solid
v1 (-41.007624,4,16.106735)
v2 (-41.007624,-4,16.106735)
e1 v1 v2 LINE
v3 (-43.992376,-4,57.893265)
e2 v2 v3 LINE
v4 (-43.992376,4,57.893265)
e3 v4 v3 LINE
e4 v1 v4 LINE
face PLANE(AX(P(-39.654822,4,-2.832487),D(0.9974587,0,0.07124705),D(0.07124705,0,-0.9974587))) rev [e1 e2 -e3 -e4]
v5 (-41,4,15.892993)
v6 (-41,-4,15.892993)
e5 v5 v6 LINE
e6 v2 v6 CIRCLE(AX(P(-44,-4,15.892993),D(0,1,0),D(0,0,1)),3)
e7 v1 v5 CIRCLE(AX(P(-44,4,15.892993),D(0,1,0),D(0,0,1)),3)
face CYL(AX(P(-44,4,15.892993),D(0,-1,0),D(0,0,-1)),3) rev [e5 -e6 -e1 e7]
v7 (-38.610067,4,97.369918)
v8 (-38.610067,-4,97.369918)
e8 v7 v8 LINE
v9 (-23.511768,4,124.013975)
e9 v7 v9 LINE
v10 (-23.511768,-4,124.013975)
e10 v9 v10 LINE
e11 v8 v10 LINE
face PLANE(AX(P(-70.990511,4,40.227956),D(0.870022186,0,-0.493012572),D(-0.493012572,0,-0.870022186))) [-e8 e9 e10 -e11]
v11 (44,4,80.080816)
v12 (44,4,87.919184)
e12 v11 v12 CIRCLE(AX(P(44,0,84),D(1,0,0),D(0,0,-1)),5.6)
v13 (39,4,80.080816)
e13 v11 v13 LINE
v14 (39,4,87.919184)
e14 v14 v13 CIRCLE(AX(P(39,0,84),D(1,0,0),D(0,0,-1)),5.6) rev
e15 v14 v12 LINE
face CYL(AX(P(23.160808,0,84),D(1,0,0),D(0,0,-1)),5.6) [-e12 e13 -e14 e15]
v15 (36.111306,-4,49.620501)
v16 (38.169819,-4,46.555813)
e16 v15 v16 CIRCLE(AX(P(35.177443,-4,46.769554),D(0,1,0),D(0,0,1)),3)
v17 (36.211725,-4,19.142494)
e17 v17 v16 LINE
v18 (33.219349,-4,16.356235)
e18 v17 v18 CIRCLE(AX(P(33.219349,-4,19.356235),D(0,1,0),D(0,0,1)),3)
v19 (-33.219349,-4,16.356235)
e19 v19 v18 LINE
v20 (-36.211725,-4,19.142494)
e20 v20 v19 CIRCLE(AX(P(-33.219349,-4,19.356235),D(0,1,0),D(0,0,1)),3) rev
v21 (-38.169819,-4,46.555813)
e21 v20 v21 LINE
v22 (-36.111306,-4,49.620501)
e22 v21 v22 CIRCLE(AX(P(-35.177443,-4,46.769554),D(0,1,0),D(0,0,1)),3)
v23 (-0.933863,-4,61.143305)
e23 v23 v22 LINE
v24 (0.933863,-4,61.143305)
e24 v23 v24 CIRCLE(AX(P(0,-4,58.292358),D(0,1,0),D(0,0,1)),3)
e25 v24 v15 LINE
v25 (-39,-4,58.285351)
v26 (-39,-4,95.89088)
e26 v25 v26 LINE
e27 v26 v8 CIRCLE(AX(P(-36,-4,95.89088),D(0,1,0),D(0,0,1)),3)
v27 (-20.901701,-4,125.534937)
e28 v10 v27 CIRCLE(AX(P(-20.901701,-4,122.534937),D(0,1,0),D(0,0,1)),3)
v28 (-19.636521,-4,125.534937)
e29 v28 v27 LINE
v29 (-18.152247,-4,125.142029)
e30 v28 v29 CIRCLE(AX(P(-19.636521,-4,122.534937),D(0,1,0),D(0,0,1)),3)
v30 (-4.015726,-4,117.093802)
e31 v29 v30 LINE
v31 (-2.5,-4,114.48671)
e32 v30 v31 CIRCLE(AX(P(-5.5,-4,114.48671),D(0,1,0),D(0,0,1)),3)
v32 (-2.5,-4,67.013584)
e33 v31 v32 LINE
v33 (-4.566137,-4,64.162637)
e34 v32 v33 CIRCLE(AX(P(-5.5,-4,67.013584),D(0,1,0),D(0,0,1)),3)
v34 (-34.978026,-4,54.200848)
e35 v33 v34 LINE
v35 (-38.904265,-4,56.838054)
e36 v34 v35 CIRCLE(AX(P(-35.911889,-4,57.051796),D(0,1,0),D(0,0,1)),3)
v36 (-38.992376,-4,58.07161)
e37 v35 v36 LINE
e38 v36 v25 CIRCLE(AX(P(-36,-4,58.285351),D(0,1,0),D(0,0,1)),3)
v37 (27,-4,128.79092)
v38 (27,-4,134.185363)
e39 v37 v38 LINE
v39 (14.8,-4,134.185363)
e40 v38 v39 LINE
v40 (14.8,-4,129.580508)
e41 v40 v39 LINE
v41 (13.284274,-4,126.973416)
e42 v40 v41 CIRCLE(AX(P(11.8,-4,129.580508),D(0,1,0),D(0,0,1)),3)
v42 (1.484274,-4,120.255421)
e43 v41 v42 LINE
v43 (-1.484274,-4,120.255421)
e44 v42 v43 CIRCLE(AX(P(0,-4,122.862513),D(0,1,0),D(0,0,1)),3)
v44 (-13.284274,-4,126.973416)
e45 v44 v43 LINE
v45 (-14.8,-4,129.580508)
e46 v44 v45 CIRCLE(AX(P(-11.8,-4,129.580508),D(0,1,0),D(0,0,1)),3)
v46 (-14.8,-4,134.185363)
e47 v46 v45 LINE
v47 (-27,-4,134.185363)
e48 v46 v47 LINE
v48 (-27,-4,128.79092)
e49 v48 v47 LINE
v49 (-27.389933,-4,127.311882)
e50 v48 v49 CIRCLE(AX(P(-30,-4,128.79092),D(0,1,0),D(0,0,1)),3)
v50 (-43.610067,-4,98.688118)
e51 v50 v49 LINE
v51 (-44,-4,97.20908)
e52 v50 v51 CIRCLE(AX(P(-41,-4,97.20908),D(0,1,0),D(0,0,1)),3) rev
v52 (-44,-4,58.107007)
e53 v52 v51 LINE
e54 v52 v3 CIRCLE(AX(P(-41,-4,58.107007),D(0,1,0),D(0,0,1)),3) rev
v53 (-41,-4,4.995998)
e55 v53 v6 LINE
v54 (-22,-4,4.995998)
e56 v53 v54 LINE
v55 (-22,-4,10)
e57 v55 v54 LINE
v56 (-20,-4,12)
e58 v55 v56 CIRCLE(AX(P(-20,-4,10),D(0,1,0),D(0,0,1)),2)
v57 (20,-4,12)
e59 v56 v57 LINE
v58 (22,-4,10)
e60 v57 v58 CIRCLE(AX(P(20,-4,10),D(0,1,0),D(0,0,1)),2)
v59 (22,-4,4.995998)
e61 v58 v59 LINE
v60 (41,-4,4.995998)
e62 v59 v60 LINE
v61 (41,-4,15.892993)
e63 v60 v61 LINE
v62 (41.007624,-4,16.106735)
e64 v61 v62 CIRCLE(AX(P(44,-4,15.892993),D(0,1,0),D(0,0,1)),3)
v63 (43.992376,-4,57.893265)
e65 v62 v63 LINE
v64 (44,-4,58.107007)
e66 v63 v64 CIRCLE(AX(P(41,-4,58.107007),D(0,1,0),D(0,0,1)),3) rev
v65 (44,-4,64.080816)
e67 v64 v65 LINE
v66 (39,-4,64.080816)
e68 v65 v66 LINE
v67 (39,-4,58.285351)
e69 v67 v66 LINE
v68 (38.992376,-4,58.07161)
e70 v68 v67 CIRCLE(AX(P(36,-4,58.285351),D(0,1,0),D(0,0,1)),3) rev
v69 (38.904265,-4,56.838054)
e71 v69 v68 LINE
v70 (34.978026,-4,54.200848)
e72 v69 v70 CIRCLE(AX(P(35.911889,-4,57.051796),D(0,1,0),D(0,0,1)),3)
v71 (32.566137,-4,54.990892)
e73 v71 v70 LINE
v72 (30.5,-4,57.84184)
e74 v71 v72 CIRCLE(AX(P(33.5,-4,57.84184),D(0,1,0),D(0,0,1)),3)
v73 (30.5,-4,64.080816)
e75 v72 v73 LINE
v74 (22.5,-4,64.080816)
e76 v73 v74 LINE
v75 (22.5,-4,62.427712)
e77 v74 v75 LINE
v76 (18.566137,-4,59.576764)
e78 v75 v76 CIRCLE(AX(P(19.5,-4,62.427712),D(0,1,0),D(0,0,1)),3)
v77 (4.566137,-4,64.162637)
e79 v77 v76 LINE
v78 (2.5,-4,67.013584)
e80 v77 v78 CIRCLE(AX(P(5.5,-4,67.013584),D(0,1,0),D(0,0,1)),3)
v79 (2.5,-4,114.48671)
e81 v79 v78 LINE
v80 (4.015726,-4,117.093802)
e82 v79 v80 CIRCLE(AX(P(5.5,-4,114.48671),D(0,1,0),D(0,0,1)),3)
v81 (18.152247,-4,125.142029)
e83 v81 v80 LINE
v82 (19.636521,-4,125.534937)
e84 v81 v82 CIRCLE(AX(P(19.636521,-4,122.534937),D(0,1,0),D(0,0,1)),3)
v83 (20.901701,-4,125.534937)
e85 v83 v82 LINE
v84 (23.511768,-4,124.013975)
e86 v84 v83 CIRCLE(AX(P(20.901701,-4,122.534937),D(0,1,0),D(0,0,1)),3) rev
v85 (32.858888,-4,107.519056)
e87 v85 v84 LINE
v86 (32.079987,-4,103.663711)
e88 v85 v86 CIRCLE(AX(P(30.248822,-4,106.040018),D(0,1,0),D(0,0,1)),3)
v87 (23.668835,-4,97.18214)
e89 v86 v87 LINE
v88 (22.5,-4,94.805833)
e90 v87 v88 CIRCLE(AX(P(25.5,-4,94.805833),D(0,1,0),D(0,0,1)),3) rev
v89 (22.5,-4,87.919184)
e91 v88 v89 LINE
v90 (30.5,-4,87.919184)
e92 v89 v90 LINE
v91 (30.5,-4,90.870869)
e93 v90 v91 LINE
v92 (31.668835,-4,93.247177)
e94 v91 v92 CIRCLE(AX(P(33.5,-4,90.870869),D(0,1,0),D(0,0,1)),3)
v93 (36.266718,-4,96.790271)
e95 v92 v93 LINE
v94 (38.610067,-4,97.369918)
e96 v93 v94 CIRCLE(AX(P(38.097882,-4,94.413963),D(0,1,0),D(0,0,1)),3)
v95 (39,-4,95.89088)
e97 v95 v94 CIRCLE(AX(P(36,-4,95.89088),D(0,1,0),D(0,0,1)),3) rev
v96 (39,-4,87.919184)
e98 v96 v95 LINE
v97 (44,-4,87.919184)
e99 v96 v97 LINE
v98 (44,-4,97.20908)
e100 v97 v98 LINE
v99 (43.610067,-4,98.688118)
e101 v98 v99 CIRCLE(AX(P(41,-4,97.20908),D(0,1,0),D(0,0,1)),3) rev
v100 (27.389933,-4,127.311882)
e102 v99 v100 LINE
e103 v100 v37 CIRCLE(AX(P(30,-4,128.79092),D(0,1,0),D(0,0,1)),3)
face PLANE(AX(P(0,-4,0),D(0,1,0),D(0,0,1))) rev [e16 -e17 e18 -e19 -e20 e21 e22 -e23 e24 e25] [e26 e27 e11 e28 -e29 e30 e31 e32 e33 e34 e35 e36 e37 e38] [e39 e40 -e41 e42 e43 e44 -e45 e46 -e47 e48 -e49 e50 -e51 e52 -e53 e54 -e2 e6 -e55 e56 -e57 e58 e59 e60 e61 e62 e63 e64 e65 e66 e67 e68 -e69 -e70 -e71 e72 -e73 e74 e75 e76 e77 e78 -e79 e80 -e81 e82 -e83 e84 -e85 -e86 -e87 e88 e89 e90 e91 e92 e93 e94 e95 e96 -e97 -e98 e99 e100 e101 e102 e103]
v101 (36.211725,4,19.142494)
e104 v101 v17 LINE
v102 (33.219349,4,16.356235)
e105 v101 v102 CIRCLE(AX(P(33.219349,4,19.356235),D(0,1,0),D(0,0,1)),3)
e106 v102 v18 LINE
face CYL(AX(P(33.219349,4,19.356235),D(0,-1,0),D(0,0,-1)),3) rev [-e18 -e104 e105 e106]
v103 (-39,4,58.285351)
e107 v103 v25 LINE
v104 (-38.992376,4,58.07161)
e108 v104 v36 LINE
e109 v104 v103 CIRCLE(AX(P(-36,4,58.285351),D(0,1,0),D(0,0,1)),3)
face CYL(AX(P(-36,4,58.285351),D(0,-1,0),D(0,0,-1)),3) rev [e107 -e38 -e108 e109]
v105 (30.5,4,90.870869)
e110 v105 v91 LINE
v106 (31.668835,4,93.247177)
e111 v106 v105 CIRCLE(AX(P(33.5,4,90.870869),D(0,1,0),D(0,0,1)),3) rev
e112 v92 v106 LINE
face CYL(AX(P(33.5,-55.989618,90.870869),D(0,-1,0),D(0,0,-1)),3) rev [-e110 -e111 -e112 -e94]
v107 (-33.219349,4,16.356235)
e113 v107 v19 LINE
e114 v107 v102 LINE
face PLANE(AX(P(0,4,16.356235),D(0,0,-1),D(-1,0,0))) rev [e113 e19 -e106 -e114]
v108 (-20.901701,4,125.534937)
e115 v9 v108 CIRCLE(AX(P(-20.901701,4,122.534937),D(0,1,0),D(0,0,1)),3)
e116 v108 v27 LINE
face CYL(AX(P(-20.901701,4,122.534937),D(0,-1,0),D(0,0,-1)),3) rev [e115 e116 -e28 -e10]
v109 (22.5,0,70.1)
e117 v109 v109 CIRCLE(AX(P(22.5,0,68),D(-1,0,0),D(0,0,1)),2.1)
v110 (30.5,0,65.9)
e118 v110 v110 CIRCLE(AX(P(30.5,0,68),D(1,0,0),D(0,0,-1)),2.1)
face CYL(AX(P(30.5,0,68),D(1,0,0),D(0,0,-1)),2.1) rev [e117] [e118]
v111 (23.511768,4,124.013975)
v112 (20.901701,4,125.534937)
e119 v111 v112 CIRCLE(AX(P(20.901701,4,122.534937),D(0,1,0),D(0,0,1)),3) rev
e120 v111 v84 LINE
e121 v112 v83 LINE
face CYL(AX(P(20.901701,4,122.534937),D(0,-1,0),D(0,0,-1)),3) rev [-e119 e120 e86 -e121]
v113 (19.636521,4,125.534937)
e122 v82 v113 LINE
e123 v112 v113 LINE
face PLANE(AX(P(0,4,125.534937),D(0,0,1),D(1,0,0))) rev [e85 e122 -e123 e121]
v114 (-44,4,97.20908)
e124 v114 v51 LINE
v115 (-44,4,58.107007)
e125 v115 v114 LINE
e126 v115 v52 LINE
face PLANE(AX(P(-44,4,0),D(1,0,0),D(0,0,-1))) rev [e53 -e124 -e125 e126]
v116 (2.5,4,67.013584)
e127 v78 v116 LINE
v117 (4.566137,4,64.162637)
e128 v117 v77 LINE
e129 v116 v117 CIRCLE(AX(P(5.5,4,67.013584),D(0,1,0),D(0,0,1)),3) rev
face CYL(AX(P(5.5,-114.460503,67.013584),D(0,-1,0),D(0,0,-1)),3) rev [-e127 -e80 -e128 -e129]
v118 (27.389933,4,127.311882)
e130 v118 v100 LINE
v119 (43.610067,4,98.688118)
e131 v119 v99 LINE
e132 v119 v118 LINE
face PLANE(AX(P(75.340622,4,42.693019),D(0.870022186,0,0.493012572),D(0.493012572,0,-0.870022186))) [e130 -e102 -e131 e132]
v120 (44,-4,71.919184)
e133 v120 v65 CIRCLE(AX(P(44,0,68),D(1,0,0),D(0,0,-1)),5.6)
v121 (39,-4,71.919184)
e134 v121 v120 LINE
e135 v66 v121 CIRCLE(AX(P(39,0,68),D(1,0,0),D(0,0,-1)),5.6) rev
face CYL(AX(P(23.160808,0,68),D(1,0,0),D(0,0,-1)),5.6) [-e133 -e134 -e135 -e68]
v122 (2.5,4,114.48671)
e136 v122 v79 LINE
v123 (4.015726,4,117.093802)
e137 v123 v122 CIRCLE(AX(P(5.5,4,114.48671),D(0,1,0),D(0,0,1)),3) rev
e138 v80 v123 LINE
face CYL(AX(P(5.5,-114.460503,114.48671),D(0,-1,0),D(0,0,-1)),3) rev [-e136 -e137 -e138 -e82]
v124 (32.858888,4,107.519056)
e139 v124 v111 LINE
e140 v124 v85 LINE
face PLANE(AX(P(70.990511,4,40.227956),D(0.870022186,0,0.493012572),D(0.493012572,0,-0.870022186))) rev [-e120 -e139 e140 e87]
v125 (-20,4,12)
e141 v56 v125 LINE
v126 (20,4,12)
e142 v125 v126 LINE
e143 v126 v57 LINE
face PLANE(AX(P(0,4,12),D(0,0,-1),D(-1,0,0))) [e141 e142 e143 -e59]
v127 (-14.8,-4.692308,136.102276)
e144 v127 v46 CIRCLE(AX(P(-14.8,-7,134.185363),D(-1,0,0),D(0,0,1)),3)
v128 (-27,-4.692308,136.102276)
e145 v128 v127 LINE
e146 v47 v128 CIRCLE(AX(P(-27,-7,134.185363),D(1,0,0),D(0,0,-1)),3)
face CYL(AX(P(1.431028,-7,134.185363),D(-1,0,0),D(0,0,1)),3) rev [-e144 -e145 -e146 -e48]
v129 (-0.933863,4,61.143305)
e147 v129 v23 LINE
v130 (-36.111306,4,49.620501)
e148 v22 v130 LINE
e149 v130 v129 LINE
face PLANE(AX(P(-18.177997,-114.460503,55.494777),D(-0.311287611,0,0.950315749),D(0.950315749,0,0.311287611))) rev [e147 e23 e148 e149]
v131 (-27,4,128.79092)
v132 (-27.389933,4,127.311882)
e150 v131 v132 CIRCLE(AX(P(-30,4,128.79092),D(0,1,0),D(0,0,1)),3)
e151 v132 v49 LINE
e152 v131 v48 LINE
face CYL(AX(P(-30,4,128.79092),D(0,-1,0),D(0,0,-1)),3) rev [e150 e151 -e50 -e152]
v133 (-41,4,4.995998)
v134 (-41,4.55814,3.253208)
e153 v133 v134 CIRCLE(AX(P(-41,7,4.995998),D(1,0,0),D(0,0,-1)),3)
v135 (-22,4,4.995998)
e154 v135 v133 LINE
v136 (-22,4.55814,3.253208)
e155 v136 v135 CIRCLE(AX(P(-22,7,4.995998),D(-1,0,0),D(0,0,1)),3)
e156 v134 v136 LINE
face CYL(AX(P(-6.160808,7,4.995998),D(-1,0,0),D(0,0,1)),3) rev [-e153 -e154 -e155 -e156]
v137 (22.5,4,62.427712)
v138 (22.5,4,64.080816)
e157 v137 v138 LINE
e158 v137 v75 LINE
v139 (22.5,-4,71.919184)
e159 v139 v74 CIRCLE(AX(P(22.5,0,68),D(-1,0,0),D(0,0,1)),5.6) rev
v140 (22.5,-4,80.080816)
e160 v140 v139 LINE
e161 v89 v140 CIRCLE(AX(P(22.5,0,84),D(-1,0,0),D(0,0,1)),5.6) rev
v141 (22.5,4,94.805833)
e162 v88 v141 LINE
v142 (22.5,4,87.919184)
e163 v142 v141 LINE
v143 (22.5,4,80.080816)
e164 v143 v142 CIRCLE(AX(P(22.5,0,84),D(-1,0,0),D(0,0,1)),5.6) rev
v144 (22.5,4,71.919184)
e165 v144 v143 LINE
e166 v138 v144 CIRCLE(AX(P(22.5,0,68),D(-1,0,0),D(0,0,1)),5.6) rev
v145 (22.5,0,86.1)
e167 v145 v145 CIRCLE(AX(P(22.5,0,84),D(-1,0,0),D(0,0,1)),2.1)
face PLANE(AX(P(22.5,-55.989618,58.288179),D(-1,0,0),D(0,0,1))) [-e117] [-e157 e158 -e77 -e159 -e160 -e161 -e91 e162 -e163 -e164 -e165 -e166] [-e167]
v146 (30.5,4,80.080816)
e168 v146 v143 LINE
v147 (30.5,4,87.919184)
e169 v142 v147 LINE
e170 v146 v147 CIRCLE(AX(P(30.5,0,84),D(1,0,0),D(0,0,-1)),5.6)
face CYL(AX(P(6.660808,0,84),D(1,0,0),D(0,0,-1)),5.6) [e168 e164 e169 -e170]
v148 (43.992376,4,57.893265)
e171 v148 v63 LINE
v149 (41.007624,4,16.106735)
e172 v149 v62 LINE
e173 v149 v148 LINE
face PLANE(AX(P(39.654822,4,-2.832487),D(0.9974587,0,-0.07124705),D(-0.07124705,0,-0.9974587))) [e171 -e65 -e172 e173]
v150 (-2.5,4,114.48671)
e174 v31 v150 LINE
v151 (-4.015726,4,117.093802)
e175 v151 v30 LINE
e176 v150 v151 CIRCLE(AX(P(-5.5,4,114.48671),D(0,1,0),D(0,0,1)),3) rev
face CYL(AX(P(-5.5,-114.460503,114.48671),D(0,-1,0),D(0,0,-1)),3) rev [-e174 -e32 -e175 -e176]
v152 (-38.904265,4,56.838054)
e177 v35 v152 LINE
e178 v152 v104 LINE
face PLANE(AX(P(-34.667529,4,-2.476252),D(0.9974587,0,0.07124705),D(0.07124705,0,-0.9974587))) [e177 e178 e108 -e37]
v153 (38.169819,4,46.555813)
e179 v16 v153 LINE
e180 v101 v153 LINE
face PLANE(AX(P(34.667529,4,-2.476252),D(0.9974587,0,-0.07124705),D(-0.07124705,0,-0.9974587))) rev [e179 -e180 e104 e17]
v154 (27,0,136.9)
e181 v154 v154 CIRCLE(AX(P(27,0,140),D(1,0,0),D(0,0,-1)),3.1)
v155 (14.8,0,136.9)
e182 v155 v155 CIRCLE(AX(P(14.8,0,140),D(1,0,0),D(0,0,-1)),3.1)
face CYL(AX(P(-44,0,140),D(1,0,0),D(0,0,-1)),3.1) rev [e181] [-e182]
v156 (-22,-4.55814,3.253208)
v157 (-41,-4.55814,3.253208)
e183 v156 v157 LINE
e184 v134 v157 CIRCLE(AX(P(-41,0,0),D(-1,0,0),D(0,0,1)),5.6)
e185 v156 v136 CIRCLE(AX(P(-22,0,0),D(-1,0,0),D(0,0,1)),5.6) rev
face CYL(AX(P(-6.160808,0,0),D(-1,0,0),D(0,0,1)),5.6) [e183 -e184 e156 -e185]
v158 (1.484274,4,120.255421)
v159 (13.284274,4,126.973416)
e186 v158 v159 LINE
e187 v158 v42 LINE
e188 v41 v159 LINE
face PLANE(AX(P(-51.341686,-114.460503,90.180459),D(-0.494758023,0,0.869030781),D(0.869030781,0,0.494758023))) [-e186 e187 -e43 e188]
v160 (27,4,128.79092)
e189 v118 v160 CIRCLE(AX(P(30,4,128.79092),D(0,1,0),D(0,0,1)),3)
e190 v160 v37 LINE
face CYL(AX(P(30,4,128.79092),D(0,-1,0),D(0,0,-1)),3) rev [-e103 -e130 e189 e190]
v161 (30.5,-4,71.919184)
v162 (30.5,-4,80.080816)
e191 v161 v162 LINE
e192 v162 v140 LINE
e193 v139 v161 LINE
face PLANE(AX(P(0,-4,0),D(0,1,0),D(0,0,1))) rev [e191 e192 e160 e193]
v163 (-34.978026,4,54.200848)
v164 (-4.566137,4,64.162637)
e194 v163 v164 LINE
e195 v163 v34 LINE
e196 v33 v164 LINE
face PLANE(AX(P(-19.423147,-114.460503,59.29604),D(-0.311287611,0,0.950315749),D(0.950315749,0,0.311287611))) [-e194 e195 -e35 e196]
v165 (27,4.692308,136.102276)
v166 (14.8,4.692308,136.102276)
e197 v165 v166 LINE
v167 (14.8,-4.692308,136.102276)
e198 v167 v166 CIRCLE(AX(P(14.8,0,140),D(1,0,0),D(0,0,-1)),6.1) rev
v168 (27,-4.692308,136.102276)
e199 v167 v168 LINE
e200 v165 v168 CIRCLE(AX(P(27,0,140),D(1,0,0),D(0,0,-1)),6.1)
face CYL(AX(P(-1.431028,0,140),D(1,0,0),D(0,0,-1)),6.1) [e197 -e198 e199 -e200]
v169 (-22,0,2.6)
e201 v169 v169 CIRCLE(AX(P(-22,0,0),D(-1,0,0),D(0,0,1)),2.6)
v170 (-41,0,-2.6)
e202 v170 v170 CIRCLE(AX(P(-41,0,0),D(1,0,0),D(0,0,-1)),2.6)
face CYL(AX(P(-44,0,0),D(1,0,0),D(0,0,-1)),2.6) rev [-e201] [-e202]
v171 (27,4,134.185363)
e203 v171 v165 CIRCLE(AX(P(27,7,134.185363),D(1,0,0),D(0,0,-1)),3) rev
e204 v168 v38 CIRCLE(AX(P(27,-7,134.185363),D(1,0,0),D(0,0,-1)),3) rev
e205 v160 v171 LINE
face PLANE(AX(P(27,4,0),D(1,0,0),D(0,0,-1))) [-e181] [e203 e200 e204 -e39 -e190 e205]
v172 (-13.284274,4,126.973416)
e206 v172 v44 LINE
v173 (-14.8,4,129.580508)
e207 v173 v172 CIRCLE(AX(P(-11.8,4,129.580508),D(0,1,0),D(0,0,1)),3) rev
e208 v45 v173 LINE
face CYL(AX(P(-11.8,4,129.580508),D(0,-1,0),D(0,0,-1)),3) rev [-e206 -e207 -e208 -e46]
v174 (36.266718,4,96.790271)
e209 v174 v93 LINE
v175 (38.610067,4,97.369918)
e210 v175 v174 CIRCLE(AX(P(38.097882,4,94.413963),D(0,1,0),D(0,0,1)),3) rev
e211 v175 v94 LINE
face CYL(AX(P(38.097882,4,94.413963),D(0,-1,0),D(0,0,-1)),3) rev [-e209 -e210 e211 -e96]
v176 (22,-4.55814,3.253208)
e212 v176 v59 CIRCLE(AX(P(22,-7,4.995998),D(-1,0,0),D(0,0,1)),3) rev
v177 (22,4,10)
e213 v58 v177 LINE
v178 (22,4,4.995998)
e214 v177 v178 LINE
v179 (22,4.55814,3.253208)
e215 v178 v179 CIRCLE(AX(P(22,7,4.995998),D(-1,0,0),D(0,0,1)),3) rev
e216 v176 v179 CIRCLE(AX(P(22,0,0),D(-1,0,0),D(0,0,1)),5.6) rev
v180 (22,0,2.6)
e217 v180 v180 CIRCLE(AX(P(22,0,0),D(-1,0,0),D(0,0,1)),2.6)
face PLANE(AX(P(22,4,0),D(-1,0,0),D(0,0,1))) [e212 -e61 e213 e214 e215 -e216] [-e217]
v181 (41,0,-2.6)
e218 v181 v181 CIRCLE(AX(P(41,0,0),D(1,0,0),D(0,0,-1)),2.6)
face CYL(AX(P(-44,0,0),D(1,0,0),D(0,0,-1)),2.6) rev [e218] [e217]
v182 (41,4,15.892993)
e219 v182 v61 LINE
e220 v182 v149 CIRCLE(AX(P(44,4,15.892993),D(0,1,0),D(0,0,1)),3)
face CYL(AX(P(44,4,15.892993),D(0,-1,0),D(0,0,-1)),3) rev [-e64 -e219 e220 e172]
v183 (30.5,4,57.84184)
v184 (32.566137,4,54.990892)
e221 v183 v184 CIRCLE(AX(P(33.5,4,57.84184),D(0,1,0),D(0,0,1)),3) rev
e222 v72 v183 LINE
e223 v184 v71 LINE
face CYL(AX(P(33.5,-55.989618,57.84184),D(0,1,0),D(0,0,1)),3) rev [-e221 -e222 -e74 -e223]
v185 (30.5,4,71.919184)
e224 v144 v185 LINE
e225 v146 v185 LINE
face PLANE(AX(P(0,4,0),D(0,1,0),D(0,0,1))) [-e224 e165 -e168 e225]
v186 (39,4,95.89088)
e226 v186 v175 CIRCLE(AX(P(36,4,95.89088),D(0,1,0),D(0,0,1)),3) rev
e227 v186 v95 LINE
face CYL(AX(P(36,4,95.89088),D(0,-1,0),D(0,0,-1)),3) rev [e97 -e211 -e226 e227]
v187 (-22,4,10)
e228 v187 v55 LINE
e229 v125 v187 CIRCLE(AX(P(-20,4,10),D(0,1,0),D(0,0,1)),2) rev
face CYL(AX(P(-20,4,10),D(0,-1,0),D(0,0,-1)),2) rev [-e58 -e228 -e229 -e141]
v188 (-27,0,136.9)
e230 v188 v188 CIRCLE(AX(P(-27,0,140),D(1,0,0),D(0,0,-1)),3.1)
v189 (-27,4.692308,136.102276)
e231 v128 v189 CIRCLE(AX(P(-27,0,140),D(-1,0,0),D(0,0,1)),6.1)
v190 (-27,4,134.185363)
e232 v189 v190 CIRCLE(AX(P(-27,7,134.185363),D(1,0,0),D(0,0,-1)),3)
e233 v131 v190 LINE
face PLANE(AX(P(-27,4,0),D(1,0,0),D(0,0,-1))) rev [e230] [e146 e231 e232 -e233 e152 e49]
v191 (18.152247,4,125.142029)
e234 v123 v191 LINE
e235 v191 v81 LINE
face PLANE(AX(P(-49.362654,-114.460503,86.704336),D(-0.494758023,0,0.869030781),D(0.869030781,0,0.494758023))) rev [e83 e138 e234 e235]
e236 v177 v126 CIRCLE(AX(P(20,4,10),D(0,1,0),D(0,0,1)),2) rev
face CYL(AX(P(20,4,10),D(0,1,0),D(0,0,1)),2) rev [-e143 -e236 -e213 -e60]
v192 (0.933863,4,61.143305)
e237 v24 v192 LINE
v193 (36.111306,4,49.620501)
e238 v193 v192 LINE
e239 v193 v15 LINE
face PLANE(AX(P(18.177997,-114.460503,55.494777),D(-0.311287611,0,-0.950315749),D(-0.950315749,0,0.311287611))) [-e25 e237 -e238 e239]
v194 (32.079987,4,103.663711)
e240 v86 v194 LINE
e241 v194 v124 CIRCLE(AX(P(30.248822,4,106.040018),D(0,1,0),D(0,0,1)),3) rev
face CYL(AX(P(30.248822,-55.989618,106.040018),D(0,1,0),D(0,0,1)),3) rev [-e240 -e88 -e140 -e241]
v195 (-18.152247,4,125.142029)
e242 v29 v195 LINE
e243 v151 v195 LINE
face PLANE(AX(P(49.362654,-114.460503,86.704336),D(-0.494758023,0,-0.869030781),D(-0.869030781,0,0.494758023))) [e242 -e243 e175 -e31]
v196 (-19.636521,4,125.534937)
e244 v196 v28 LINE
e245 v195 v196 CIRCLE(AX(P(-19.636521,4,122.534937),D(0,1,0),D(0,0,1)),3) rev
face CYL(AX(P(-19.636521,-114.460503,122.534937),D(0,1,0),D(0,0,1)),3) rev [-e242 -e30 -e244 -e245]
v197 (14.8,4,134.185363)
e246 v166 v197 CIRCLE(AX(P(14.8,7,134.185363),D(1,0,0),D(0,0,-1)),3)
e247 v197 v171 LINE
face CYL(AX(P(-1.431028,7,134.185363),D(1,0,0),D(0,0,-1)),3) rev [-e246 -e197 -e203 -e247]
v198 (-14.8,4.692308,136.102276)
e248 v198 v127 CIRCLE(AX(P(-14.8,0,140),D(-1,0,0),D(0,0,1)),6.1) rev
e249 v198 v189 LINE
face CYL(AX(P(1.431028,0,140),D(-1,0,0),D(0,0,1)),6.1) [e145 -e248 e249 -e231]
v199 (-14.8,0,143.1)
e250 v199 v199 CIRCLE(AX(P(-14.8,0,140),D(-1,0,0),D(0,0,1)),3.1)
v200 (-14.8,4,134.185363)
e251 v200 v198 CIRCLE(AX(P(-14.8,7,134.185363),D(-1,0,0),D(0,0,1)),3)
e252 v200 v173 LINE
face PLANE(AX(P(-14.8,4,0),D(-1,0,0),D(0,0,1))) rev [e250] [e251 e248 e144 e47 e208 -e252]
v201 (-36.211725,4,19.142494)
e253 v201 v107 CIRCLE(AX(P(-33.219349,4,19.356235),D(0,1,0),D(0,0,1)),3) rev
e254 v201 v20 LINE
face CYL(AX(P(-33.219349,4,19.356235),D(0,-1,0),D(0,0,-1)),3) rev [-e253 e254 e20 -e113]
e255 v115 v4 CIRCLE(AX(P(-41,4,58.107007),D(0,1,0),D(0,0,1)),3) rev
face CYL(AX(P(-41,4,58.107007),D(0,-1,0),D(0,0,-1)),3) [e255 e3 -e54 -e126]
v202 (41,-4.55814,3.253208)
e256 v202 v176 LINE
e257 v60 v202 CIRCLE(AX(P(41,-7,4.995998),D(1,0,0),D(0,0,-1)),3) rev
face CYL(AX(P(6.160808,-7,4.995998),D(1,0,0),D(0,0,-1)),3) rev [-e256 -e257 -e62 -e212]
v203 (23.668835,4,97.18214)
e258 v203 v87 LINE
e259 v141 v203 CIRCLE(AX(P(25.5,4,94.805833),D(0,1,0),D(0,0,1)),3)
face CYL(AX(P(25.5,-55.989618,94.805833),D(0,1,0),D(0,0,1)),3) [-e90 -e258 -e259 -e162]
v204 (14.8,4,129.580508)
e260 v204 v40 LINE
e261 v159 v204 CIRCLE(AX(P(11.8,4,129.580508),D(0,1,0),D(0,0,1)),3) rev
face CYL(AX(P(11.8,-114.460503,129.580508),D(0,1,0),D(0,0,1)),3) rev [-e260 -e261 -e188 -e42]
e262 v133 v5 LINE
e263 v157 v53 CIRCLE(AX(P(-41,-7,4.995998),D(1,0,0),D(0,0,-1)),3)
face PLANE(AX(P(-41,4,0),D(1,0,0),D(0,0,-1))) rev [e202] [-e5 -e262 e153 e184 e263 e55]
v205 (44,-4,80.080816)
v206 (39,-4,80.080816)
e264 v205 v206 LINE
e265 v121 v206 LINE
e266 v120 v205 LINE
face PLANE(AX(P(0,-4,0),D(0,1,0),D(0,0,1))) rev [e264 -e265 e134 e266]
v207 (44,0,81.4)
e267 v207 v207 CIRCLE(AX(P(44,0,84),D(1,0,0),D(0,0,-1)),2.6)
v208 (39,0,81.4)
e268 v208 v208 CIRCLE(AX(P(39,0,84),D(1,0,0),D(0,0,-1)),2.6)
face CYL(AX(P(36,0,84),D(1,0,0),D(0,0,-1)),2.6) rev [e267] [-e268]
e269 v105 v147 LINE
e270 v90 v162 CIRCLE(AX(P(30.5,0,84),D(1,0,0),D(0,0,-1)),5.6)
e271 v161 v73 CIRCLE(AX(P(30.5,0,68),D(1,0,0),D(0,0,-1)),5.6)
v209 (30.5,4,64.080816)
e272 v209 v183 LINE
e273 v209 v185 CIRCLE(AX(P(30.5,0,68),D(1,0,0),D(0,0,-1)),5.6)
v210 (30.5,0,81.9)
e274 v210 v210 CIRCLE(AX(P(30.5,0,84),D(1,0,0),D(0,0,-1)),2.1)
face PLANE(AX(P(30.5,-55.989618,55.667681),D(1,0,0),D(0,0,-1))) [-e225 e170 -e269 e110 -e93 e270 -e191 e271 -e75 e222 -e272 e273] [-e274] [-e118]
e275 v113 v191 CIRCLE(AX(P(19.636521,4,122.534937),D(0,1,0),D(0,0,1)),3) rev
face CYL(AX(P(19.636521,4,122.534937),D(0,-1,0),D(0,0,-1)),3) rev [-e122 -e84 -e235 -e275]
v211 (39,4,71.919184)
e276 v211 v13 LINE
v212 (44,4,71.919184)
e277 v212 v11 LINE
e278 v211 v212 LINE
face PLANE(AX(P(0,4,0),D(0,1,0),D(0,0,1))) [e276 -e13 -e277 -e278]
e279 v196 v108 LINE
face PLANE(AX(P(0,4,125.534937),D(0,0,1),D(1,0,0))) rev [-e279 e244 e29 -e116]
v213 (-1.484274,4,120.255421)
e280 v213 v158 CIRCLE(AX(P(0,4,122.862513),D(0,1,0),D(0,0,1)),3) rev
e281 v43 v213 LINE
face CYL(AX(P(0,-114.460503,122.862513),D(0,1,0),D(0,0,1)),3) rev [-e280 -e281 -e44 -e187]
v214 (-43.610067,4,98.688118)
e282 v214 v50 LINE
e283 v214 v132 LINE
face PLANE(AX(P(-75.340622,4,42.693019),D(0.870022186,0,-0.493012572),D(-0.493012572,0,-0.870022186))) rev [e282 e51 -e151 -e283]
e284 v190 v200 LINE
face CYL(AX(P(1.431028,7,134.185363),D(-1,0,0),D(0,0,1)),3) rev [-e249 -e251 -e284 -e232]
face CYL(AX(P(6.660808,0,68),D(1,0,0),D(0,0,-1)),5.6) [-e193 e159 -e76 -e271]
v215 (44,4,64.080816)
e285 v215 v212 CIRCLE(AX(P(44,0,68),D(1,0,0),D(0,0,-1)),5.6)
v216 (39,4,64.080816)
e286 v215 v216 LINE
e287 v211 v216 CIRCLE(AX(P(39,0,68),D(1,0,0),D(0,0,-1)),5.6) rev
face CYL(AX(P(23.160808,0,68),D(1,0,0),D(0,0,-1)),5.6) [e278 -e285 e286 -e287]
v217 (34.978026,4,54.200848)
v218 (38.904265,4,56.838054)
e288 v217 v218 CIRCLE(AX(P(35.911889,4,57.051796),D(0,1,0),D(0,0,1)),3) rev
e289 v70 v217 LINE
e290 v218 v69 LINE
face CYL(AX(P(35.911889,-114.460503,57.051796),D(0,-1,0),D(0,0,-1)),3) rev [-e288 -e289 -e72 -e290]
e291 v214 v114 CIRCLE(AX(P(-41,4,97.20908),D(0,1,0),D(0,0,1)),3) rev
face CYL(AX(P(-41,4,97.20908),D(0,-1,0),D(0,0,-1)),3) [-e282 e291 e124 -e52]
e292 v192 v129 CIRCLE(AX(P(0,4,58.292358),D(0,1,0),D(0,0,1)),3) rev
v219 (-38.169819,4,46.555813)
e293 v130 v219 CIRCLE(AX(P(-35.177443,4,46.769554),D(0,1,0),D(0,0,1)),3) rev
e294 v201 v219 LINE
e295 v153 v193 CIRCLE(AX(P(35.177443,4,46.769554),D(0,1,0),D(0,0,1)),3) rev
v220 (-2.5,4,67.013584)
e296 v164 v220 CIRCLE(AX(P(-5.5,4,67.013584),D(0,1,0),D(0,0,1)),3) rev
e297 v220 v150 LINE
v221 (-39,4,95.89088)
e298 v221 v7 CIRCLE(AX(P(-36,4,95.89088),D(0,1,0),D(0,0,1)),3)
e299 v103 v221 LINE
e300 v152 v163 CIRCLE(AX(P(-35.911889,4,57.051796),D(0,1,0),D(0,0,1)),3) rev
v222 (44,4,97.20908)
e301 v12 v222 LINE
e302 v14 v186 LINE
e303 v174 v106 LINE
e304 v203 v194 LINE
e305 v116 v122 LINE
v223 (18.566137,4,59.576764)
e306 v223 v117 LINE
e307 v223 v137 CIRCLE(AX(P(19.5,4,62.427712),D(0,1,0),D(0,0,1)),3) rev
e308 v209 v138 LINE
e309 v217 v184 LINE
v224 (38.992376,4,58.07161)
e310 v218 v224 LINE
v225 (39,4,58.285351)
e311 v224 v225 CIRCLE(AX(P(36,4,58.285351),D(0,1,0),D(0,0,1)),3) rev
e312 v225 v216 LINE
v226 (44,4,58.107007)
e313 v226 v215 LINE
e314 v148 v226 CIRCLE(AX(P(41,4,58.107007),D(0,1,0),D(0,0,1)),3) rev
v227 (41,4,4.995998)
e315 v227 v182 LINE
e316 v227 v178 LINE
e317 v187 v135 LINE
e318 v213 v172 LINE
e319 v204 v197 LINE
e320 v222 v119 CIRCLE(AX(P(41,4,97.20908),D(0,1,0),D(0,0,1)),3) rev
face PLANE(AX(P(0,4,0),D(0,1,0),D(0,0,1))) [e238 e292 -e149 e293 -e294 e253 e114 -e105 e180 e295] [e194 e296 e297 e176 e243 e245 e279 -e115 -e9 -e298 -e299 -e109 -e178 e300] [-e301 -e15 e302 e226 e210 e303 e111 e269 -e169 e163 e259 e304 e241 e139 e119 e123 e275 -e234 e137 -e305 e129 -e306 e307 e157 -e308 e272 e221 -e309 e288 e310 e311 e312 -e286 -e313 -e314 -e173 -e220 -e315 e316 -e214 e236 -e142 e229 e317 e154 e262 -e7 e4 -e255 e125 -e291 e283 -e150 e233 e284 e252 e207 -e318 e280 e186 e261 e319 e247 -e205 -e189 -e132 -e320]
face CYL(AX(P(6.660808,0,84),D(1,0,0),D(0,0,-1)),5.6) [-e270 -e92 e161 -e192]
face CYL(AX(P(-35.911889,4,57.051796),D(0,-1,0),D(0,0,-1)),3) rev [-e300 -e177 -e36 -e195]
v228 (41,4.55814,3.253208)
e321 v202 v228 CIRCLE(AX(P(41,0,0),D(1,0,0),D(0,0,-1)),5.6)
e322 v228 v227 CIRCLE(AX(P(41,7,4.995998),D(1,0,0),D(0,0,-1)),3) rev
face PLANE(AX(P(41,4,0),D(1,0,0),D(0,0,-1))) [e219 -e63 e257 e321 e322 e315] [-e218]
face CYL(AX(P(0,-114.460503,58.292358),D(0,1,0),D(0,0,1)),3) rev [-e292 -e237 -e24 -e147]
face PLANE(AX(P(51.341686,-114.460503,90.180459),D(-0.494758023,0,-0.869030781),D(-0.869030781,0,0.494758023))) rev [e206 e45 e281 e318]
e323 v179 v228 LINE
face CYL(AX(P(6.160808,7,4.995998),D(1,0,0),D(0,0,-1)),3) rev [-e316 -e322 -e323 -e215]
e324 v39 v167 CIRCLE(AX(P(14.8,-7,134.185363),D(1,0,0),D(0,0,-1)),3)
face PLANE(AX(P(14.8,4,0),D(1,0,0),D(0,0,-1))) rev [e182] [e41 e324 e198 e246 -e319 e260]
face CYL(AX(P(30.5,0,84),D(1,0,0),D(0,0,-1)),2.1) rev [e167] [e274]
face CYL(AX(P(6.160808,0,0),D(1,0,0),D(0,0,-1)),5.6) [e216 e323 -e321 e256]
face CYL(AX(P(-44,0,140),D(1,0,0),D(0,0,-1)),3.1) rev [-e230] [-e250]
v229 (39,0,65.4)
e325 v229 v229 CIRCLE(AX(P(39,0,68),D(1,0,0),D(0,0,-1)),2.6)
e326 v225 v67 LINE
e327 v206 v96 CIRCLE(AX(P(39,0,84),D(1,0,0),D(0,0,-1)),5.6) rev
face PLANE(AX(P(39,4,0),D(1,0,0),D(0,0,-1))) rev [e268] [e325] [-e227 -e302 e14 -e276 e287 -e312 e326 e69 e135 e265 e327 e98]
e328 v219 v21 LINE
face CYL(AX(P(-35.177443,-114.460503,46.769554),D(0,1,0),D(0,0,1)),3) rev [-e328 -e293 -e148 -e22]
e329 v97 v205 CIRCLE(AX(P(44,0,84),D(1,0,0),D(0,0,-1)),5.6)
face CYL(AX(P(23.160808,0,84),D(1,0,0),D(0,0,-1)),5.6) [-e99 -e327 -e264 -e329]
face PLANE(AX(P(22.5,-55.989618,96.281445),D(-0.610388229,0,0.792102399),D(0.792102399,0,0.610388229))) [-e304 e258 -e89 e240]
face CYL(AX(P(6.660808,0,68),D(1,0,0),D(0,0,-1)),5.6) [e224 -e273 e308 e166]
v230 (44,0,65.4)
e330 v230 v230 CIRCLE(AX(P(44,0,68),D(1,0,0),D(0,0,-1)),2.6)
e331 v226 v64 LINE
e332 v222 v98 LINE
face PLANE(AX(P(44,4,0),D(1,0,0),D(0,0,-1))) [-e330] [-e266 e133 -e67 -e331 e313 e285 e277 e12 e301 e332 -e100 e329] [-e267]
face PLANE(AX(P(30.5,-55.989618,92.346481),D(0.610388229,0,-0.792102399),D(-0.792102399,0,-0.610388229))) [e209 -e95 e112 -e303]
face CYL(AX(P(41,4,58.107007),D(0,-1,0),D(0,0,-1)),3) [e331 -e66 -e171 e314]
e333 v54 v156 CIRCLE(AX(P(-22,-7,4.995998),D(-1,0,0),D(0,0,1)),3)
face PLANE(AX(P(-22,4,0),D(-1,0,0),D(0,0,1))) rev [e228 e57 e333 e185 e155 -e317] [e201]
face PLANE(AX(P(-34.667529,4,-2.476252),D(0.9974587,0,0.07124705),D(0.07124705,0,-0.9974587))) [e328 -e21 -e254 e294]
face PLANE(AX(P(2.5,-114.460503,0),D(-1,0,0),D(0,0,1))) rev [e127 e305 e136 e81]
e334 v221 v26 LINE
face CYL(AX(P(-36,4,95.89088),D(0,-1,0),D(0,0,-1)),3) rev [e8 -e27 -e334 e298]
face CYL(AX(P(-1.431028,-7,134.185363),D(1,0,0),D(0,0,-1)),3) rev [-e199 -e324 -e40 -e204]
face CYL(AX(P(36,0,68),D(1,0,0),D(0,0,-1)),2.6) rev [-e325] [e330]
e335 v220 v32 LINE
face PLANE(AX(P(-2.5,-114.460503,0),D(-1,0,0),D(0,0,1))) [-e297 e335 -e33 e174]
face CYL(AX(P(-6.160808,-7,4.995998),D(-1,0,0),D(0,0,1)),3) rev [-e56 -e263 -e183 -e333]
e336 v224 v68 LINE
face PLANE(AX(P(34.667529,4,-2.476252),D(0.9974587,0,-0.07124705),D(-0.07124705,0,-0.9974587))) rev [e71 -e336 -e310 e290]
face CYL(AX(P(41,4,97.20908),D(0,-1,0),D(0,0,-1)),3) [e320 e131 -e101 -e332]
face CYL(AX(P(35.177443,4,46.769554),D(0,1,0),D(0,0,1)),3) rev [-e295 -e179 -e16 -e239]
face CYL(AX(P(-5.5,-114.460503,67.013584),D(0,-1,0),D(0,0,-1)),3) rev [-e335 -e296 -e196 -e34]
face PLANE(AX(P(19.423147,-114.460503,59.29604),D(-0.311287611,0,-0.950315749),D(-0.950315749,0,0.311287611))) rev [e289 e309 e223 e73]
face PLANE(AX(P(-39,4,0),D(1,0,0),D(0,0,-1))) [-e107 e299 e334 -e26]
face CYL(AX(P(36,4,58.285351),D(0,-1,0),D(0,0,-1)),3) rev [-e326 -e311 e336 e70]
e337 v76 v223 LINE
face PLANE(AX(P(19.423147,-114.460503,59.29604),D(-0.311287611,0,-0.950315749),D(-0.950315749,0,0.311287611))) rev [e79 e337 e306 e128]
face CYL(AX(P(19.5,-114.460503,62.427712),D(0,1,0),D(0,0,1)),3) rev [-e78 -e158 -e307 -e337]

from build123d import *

# Parameters (mm, degrees)
EXTRUDE_1_DEPTH          = 4
FILLET_1_R               = 2
FILLET_2_R               = 4
SKETCH_2_R               = 2.6
CUT_EXTRUDE_1_DEPTH      = 168.263265543
EXTRUDE_3_DEPTH          = 8
EXTRUDE_4_DEPTH          = 8
FILLET_3_R               = 3
FILLET_4_R               = 3
FILLET_5_R               = 3
FILLET_6_R               = 4
CUT_EXTRUDE_2_DEPTH      = 161.601992516
CUT_EXTRUDE_2_DEPTH_BACK = 161.601992516
SKETCH_5_R               = 3.1
EXTRUDE_5_DEPTH          = 12.2
EXTRUDE_START            = -12.2
EXTRUDE_6_DEPTH          = 12.2
FILLET_7_R               = 3
SKETCH_8_R               = 2.6
CUT_EXTRUDE_3_DEPTH      = 8
SKETCH_9_R               = 5.6
SKETCH_9_R_2             = 2.6
EXTRUDE_7_DEPTH          = 8
SKETCH_10_R              = 5.6
SKETCH_10_R_2            = 2.6
EXTRUDE_8_DEPTH          = 5
SKETCH_11_R              = 2
CUT_EXTRUDE_4_DEPTH      = 8
HOLE_WIZARD_M5_2_D       = 4.2
HOLE_WIZARD_M5_2_DEPTH   = 12.4
HOLE_WIZARD_M5_2_TIP     = 1.2618073
SKETCH_15_R              = 5.6
SKETCH_15_R_2            = 2.6
EXTRUDE_9_DEPTH          = 19
EXTRUDE_START_2          = -19
SKETCH_16_R              = 5.6
SKETCH_16_R_2            = 2.6
EXTRUDE_10_DEPTH         = 19
FILLET_8_R               = 3


# Some blends are built 0.0001 mm under size
with BuildPart() as part:
    # 草图1 → 凸台-拉伸1 (new, symmetric)
    with BuildSketch(Plane(origin=(0, 0, 0), x_dir=(1, 0, 0), z_dir=(0, 1, 0))):
        with BuildLine():
            Line((-22, 4), (-41, 4))
            Line((-41, 4), (-41, 0))
            Line((-41, 0), (-41, -15.892993457))
            ThreePointArc((-41, -15.892993457), (-41.001906581, -15.999931994), (-41.007623901, -16.106734607))
            Line((-41.007623901, -16.106734607), (-43.992376099, -57.893265393))
            ThreePointArc((-43.992376099, -57.893265393), (-43.998093419, -58.000068006), (-44, -58.107006543))
            Line((-44, -58.107006543), (-44, -97.209080124))
            ThreePointArc((-44, -97.209080124), (-43.900879149, -97.973867783), (-43.610066558, -98.68811784))
            Line((-43.610066558, -98.68811784), (-27.389933442, -127.31188216))
            ThreePointArc((-27.389933442, -127.31188216), (-27.099120851, -128.026132217), (-27, -128.790919876))
            Line((-27, -128.790919876), (-27, -140))
            Line((-27, -140), (-27, -141))
            Line((-27, -141), (-27, -144))
            Line((-27, -144), (-24, -144))
            Line((-24, -144), (-14.8, -144))
            Line((-14.8, -144), (-14.8, -125.53493714))
            Line((-14.8, -125.53493714), (-20.901701141, -125.53493714))
            ThreePointArc((-20.901701141, -125.53493714), (-22.412145918, -125.126954998), (-23.511767698, -124.013974856))
            Line((-23.511767698, -124.013974856), (-38.610066558, -97.369918046))
            ThreePointArc((-38.610066558, -97.369918046), (-38.900879149, -96.655667989), (-39, -95.89088033))
            Line((-39, -95.89088033), (-39, -58.285350781))
            ThreePointArc((-39, -58.285350781), (-38.998093419, -58.178412244), (-38.992376099, -58.071609631))
            Line((-38.992376099, -58.071609631), (-36.21172499, -19.1424941))
            ThreePointArc((-36.21172499, -19.1424941), (-35.263704113, -17.160646098), (-33.219348891, -16.35623525))
            Line((-33.219348891, -16.35623525), (33.219348891, -16.35623525))
            ThreePointArc((33.219348891, -16.35623525), (35.263704113, -17.160646098), (36.21172499, -19.1424941))
            Line((36.21172499, -19.1424941), (38.992376099, -58.071609631))
            ThreePointArc((38.992376099, -58.071609631), (38.998093419, -58.178412244), (39, -58.285350781))
            Line((39, -58.285350781), (39, -95.89088033))
            ThreePointArc((39, -95.89088033), (38.900879149, -96.655667989), (38.610066558, -97.369918046))
            Line((38.610066558, -97.369918046), (23.511767698, -124.013974856))
            ThreePointArc((23.511767698, -124.013974856), (22.412145918, -125.126954998), (20.901701141, -125.53493714))
            Line((20.901701141, -125.53493714), (14.8, -125.53493714))
            Line((14.8, -125.53493714), (14.8, -144))
            Line((14.8, -144), (24, -144))
            Line((24, -144), (27, -144))
            Line((27, -144), (27, -141))
            Line((27, -141), (27, -140))
            Line((27, -140), (27, -128.790919876))
            ThreePointArc((27, -128.790919876), (27.099120851, -128.026132217), (27.389933442, -127.31188216))
            Line((27.389933442, -127.31188216), (43.610066558, -98.68811784))
            ThreePointArc((43.610066558, -98.68811784), (43.900879149, -97.973867783), (44, -97.209080124))
            Line((44, -97.209080124), (44, -58.107006543))
            ThreePointArc((44, -58.107006543), (43.998093419, -58.000068006), (43.992376099, -57.893265393))
            Line((43.992376099, -57.893265393), (41.007623901, -16.106734607))
            ThreePointArc((41.007623901, -16.106734607), (41.001906581, -15.999931994), (41, -15.892993457))
            Line((41, -15.892993457), (41, 0))
            Line((41, 0), (41, 4))
            Line((41, 4), (22, 4))
            Line((22, 4), (22, -12))
            Line((22, -12), (-22, -12))
            Line((-22, -12), (-22, 4))
        make_face()
    extrude(amount=EXTRUDE_1_DEPTH, both=True)

    # 圆角1
    fillet_1_edges = [part.edges().sort_by_distance(p)[0] for p in [
        (-22, 0, 12),
        (22, 0, 12),
    ]]
    fillet(fillet_1_edges, radius=FILLET_1_R)

    # 圆角2
    fillet_2_edges = [part.edges().sort_by_distance(p)[0] for p in [
        (-31.5, -4, -4),
        (-31.5, 4, -4),
        (31.5, -4, -4),
        (31.5, 4, -4),
    ]]
    fillet(fillet_2_edges, radius=FILLET_2_R - 0.0001)  # a hair under: the kernel refuses the full size

    # 草图2 → 切除-拉伸1 (cut, through all)
    with BuildSketch(Plane(origin=(41, 0, 0), x_dir=(0, 0, -1), z_dir=(1, 0, 0))):
        Circle(SKETCH_2_R)
    extrude(amount=-CUT_EXTRUDE_1_DEPTH, mode=Mode.SUBTRACT)

    # 草图3 → 凸台-拉伸3 (add)
    with BuildSketch(Plane(origin=(0, 4, 0), x_dir=(1, 0, 0), z_dir=(0, 1, 0))):
        Polygon((-14.8, -125.53493714), (0, -117.108976983), (14.8, -125.53493714), (18.842380129, -125.53493714), (2.5, -116.230866611), (2.5, -64.839425262), (38.630436585, -53.004456422), (38.336658254, -48.891559789), (0, -61.449203669), (-38.336658254, -48.891559789), (-38.630436585, -53.004456422), (-2.5, -64.839425262), (-2.5, -116.230866611), (-18.842380129, -125.53493714), align=None)
        Polygon((14.8, -125.53493714), (0, -117.108976983), (-14.8, -125.53493714), (-14.8, -127.836351593), (0, -119.410391436), (14.8, -127.836351593), align=None)
    extrude(amount=-EXTRUDE_3_DEPTH)

    # 草图4 → 凸台-拉伸4 (add)
    with BuildSketch(Plane(origin=(0, 4, 0), x_dir=(1, 0, 0), z_dir=(0, 1, 0))):
        Polygon((22.5, -58.288179299), (22.5, -96.281444507), (34.142811775, -105.253308839), (38.126447018, -98.223364291), (30.5, -92.346480828), (30.5, -55.667680914), align=None)
    extrude(amount=-EXTRUDE_4_DEPTH)

    # 圆角3
    # the kernel refuses this fillet: 3 mm, written as the material it adds along each edge
    with BuildSketch(Plane(origin=(2.5, 4, 116.230866611), x_dir=(0.8690307812892697, 0, 0.4947580228472919), z_dir=(0, -1, 0)), Plane(origin=(-2.5, 4, 116.230866611), x_dir=(0, 0, -1), z_dir=(0, -1, 0))) as fillet_3_piece_1:
        with BuildLine():
            CenterArc((FILLET_3_R * 0.581385594194, -FILLET_3_R), FILLET_3_R, 90, 60.346204643)
            Line((-FILLET_3_R * 0.287645187095, -FILLET_3_R * 0.505241977153), (0, 0))
            Line((0, 0), (FILLET_3_R * 0.581385594194, 0))
        make_face()
    extrude(amount=8)
    with BuildSketch(Plane(origin=(2.5, 4, 64.839425262), x_dir=(0, 0, 1), z_dir=(0, -1, 0)), Plane(origin=(-2.5, 4, 64.839425262), x_dir=(-0.9503157493032816, 0, -0.3112876107816409), z_dir=(0, -1, 0))) as fillet_3_piece_2:
        with BuildLine():
            CenterArc((FILLET_3_R * 0.724719536347, -FILLET_3_R), FILLET_3_R, 90, 71.863154967)
            Line((-FILLET_3_R * 0.225596212956, -FILLET_3_R * 0.688712389218), (0, 0))
            Line((0, 0), (FILLET_3_R * 0.724719536347, 0))
        make_face()
    extrude(amount=8)
    with BuildSketch(Plane(origin=(38.630436585, 4, 53.004456422), x_dir=(-0.950315749303283, 0, 0.31128761078163697), z_dir=(0, -1, 0)), Plane(origin=(-38.630436585, 4, 53.004456422), x_dir=(-0.07124704998791004, 0, 0.9974586998307349), z_dir=(0, -1, 0))) as fillet_3_piece_3:
        with BuildLine():
            CenterArc((FILLET_3_R * 1.28112173967, -FILLET_3_R), FILLET_3_R, 90, 104.051228253)
            Line((FILLET_3_R * 0.311042703978, -FILLET_3_R * 1.24278934183), (0, 0))
            Line((0, 0), (FILLET_3_R * 1.28112173967, 0))
        make_face()
    extrude(amount=8)
    with BuildSketch(Plane(origin=(38.336658254, 4, 48.891559789), x_dir=(-0.07124704998790986, 0, -0.997458699830735), z_dir=(0, -1, 0)), Plane(origin=(-38.336658254, 4, 48.891559789), x_dir=(0.9503157493032821, 0, 0.31128761078163925), z_dir=(0, -1, 0))) as fillet_3_piece_4:
        with BuildLine():
            CenterArc((FILLET_3_R * 0.780565943917, -FILLET_3_R), FILLET_3_R, 90, 75.948771747)
            Line((-FILLET_3_R * 0.189513091778, -FILLET_3_R * 0.757210658171), (0, 0))
            Line((0, 0), (FILLET_3_R * 0.780565943917, 0))
        make_face()
    extrude(amount=8)
    with BuildSketch(Plane(origin=(0, 4, 61.449203669), x_dir=(0.950315749303282, 0, -0.31128761078163986), z_dir=(0, -1, 0))) as fillet_3_piece_5:
        with BuildLine():
            CenterArc((FILLET_3_R * 0.32756229812, -FILLET_3_R), FILLET_3_R, 90, 36.273690066)
            Line((-FILLET_3_R * 0.264080740057, -FILLET_3_R * 0.193799953252), (0, 0))
            Line((0, 0), (FILLET_3_R * 0.32756229812, 0))
        make_face()
    extrude(amount=8)
    with BuildSketch(Plane(origin=(34.142811775, 4, 105.253308839), x_dir=(-0.4930125719808814, 0, 0.8700221858486117), z_dir=(0, -1, 0))) as fillet_3_piece_6:
        with BuildLine():
            CenterArc((FILLET_3_R * 0.868080201224, FILLET_3_R), FILLET_3_R, 188.078797476, 81.921202524)
            Line((-FILLET_3_R * 0.121995529748, FILLET_3_R * 0.859465139769), (0, 0))
            Line((0, 0), (FILLET_3_R * 0.868080201224, 0))
        make_face()
    extrude(amount=8)
    with BuildSketch(Plane(origin=(22.5, 4, 58.288179299), x_dir=(-0.9503157493032814, 0, 0.31128761078164163), z_dir=(0, -1, 0))) as fillet_3_piece_7:
        with BuildLine():
            CenterArc((FILLET_3_R * 1.37984413259, -FILLET_3_R), FILLET_3_R, 90, 108.136845033)
            Line((FILLET_3_R * 0.429528383284, -FILLET_3_R * 1.31128761078), (0, 0))
            Line((0, 0), (FILLET_3_R * 1.37984413259, 0))
        make_face()
    extrude(amount=8)
    with BuildSketch(Plane(origin=(30.5, 4, 55.667680914), x_dir=(0.9503157493032841, 0, -0.31128761078163375), z_dir=(0, -1, 0))) as fillet_3_piece_8:
        with BuildLine():
            CenterArc((FILLET_3_R * 0.724719536347, FILLET_3_R), FILLET_3_R, 198.136845033, 71.863154967)
            Line((-FILLET_3_R * 0.225596212956, FILLET_3_R * 0.688712389218), (0, 0))
            Line((0, 0), (FILLET_3_R * 0.724719536347, 0))
        make_face()
    extrude(amount=8)
    with BuildSketch(Plane(origin=(30.5, 4, 92.346480828), x_dir=(0.7921023987207179, 0, 0.6103882288682219), z_dir=(0, -1, 0))) as fillet_3_piece_9:
        with BuildLine():
            CenterArc((FILLET_3_R * 0.491870459881, -FILLET_3_R), FILLET_3_R, 90, 52.382420264)
            Line((-FILLET_3_R * 0.300231938839, -FILLET_3_R * 0.389611771132), (0, 0))
            Line((0, 0), (FILLET_3_R * 0.491870459881, 0))
        make_face()
    extrude(amount=8)
    with BuildSketch(Plane(origin=(38.126447018, 4, 98.223364291), x_dir=(0.4930125719808763, 0, -0.8700221858486146), z_dir=(0, -1, 0))) as fillet_3_piece_10:
        with BuildLine():
            CenterArc((3.300180493, -1.902934356), FILLET_3_R, 140.631065157, 47.44773232)
            Line((0.3299533, -2.324538937), (0, 0))
            Line((0, 0), (0.980947681, 0))
        make_face()
    extrude(amount=8)
    # the kernel refuses this fillet: 3 mm, written as the material it takes off along each edge
    with BuildSketch(Plane(origin=(22.5, 7.689028449, 96.281444507), x_dir=(0, 0, -1), z_dir=(0, -1, 0))) as fillet_3_2_piece_1:
        with BuildLine():
            CenterArc((FILLET_3_R * 0.491870459881, FILLET_3_R), FILLET_3_R, 217.617579736, 52.382420264)
            Line((-FILLET_3_R * 0.300231938839, FILLET_3_R * 0.389611771132), (0, 0))
            Line((0, 0), (FILLET_3_R * 0.491870459881, 0))
        make_face()
    extrude(amount=15.378056898, mode=Mode.SUBTRACT)

    # 圆角4
    fillet_4_edges = [part.edges().sort_by_distance(p)[0] for p in [
        (-14.8, 0, 127.836351593),
        (0, 0, 119.410391436),
        (14.8, 0, 127.836351593),
    ]]
    fillet(fillet_4_edges, radius=FILLET_4_R)

    # 圆角5
    fillet_5_edges = [part.edges().sort_by_distance(p)[0] for p in [
        (18.842380129, 0, 125.53493714),
        (-18.842380129, 0, 125.53493714),
    ]]
    fillet(fillet_5_edges, radius=FILLET_5_R)

    # 圆角6
    fillet_6_edges = [part.edges().sort_by_distance(p)[0] for p in [
        (20.9, -4, 144),
        (20.9, 4, 144),
        (-20.9, -4, 144),
        (-20.9, 4, 144),
    ]]
    fillet(fillet_6_edges, radius=FILLET_6_R - 0.0001)  # a hair under: the kernel refuses the full size

    # 草图5 → 切除-拉伸2 (cut, two sides: drawn at the far end of the back side and taken through both)
    with BuildSketch(Plane(origin=(27, 0, 0), x_dir=(0, 0, -1), z_dir=(1, 0, 0)).offset(-CUT_EXTRUDE_2_DEPTH_BACK)):
        with Locations((-140, 0)):
            Circle(SKETCH_5_R)
    extrude(amount=CUT_EXTRUDE_2_DEPTH + CUT_EXTRUDE_2_DEPTH_BACK, mode=Mode.SUBTRACT)

    # 草图6 → 凸台-拉伸5 (add)
    with BuildSketch(Plane(origin=(27, 0, 0), x_dir=(0, 0, -1), z_dir=(1, 0, 0))):
        with BuildLine():
            Line((-140, 4), (-135.394568424, 4))
            ThreePointArc((-135.394568424, 4), (-146.1, 0), (-135.394568424, -4))
            Line((-135.394568424, -4), (-140, -4))
            ThreePointArc((-140, -4), (-142.828427125, -2.828427125), (-144, 0))
            ThreePointArc((-144, 0), (-142.828427125, 2.828427125), (-140, 4))
        make_face()
    extrude(amount=-EXTRUDE_5_DEPTH)

    # 草图7 → 凸台-拉伸6 (add)
    with BuildSketch(Plane.ZY.offset(27).offset(EXTRUDE_START)):
        with BuildLine():
            ThreePointArc((135.394568424, -4), (142.135048874, -5.714154907), (146.1, 0))
            ThreePointArc((146.1, 0), (142.135048874, 5.714154907), (135.394568424, 4))
            Line((135.394568424, 4), (140, 4))
            ThreePointArc((140, 4), (142.828427125, 2.828427125), (144, 0))
            ThreePointArc((144, 0), (142.828427125, -2.828427125), (140, -4))
            Line((140, -4), (135.394568424, -4))
        make_face()
    extrude(amount=EXTRUDE_6_DEPTH)

    # 圆角7
    fillet_7_edges = [part.edges().sort_by_distance(p)[0] for p in [
        (20.9, 4, 135.394568424),
        (20.9, -4, 135.394568424),
        (-20.9, -4, 135.394568424),
        (-20.9, 4, 135.394568424),
    ]]
    fillet(fillet_7_edges, radius=FILLET_7_R)

    # 草图8 → 切除-拉伸3 (cut)
    with BuildSketch(Plane(origin=(44, 0, 0), x_dir=(0, 0, -1), z_dir=(1, 0, 0))):
        with Locations((-68, 0)):
            Circle(SKETCH_8_R)
        with Locations((-84, 0)):
            Circle(SKETCH_8_R)
    extrude(amount=-CUT_EXTRUDE_3_DEPTH, mode=Mode.SUBTRACT)

    # 草图9 → 凸台-拉伸7 (add)
    # profile 1 of 2: a face of its own
    with BuildSketch(Plane(origin=(30.5, 0, 0), x_dir=(0, 0, -1), z_dir=(1, 0, 0))):
        with Locations((-68, 0)):
            Circle(SKETCH_9_R)
        with Locations((-68, 0)):
            Circle(SKETCH_9_R_2, mode=Mode.SUBTRACT)
    # profile 2 of 2: a face of its own
    with BuildSketch(Plane(origin=(30.5, 0, 0), x_dir=(0, 0, -1), z_dir=(1, 0, 0))):
        with Locations((-84, 0)):
            Circle(SKETCH_9_R)
        with Locations((-84, 0)):
            Circle(SKETCH_9_R_2, mode=Mode.SUBTRACT)
    extrude(amount=-EXTRUDE_7_DEPTH)

    # 草图10 → 凸台-拉伸8 (add)
    # profile 1 of 2: a face of its own
    with BuildSketch(Plane(origin=(44, 0, 0), x_dir=(0, 0, -1), z_dir=(1, 0, 0))):
        with Locations((-84, 0)):
            Circle(SKETCH_10_R)
        with Locations((-84, 0)):
            Circle(SKETCH_10_R_2, mode=Mode.SUBTRACT)
    # profile 2 of 2: a face of its own
    with BuildSketch(Plane(origin=(44, 0, 0), x_dir=(0, 0, -1), z_dir=(1, 0, 0))):
        with Locations((-68, 0)):
            Circle(SKETCH_10_R)
        with Locations((-68, 0)):
            Circle(SKETCH_10_R_2, mode=Mode.SUBTRACT)
    extrude(amount=-EXTRUDE_8_DEPTH)

    # 草图11 → 切除-拉伸4 (cut)
    with BuildSketch(Plane(origin=(30.5, 0, 0), x_dir=(0, 0, -1), z_dir=(1, 0, 0))):
        with Locations((-84, 0)):
            Circle(SKETCH_11_R)
        with Locations((-68, 0)):
            Circle(SKETCH_11_R)
    extrude(amount=-CUT_EXTRUDE_4_DEPTH, mode=Mode.SUBTRACT)

    # M5 螺纹孔2
    with Locations(Plane(origin=(30.5, 0, 84), x_dir=(0, 0, 1), z_dir=(1, 0, 0))):
        with Locations((0, 0), (-16, 0)):
            Hole(HOLE_WIZARD_M5_2_D / 2, depth=HOLE_WIZARD_M5_2_DEPTH)
            with Locations((0, 0, -(HOLE_WIZARD_M5_2_DEPTH + HOLE_WIZARD_M5_2_TIP / 2))):  # 118° drill point
                Cone(0, HOLE_WIZARD_M5_2_D / 2, HOLE_WIZARD_M5_2_TIP, mode=Mode.SUBTRACT)

    # 草图15 → 凸台-拉伸9 (add)
    with BuildSketch(Plane(origin=(41, 0, 0), x_dir=(0, 0, -1), z_dir=(1, 0, 0))):
        Circle(SKETCH_15_R)
        Circle(SKETCH_15_R_2, mode=Mode.SUBTRACT)
    extrude(amount=-EXTRUDE_9_DEPTH)

    # 草图16 → 凸台-拉伸10 (add)
    with BuildSketch(Plane.ZY.offset(41).offset(EXTRUDE_START_2)):
        Circle(SKETCH_16_R)
        with Locations(Location((0, 0, 0), (0, 0, 180))):
            Circle(SKETCH_16_R_2, mode=Mode.SUBTRACT)
    extrude(amount=EXTRUDE_10_DEPTH)

    # 圆角8
    fillet_8_edges = [part.edges().sort_by_distance(p)[0] for p in [
        (31.5, -4, 3.919183588),
        (31.5, 4, 3.919183588),
        (-31.5, -4, 3.919183588),
        (-31.5, 4, 3.919183588),
    ]]
    fillet(fillet_8_edges, radius=FILLET_8_R)


solid = part.part
